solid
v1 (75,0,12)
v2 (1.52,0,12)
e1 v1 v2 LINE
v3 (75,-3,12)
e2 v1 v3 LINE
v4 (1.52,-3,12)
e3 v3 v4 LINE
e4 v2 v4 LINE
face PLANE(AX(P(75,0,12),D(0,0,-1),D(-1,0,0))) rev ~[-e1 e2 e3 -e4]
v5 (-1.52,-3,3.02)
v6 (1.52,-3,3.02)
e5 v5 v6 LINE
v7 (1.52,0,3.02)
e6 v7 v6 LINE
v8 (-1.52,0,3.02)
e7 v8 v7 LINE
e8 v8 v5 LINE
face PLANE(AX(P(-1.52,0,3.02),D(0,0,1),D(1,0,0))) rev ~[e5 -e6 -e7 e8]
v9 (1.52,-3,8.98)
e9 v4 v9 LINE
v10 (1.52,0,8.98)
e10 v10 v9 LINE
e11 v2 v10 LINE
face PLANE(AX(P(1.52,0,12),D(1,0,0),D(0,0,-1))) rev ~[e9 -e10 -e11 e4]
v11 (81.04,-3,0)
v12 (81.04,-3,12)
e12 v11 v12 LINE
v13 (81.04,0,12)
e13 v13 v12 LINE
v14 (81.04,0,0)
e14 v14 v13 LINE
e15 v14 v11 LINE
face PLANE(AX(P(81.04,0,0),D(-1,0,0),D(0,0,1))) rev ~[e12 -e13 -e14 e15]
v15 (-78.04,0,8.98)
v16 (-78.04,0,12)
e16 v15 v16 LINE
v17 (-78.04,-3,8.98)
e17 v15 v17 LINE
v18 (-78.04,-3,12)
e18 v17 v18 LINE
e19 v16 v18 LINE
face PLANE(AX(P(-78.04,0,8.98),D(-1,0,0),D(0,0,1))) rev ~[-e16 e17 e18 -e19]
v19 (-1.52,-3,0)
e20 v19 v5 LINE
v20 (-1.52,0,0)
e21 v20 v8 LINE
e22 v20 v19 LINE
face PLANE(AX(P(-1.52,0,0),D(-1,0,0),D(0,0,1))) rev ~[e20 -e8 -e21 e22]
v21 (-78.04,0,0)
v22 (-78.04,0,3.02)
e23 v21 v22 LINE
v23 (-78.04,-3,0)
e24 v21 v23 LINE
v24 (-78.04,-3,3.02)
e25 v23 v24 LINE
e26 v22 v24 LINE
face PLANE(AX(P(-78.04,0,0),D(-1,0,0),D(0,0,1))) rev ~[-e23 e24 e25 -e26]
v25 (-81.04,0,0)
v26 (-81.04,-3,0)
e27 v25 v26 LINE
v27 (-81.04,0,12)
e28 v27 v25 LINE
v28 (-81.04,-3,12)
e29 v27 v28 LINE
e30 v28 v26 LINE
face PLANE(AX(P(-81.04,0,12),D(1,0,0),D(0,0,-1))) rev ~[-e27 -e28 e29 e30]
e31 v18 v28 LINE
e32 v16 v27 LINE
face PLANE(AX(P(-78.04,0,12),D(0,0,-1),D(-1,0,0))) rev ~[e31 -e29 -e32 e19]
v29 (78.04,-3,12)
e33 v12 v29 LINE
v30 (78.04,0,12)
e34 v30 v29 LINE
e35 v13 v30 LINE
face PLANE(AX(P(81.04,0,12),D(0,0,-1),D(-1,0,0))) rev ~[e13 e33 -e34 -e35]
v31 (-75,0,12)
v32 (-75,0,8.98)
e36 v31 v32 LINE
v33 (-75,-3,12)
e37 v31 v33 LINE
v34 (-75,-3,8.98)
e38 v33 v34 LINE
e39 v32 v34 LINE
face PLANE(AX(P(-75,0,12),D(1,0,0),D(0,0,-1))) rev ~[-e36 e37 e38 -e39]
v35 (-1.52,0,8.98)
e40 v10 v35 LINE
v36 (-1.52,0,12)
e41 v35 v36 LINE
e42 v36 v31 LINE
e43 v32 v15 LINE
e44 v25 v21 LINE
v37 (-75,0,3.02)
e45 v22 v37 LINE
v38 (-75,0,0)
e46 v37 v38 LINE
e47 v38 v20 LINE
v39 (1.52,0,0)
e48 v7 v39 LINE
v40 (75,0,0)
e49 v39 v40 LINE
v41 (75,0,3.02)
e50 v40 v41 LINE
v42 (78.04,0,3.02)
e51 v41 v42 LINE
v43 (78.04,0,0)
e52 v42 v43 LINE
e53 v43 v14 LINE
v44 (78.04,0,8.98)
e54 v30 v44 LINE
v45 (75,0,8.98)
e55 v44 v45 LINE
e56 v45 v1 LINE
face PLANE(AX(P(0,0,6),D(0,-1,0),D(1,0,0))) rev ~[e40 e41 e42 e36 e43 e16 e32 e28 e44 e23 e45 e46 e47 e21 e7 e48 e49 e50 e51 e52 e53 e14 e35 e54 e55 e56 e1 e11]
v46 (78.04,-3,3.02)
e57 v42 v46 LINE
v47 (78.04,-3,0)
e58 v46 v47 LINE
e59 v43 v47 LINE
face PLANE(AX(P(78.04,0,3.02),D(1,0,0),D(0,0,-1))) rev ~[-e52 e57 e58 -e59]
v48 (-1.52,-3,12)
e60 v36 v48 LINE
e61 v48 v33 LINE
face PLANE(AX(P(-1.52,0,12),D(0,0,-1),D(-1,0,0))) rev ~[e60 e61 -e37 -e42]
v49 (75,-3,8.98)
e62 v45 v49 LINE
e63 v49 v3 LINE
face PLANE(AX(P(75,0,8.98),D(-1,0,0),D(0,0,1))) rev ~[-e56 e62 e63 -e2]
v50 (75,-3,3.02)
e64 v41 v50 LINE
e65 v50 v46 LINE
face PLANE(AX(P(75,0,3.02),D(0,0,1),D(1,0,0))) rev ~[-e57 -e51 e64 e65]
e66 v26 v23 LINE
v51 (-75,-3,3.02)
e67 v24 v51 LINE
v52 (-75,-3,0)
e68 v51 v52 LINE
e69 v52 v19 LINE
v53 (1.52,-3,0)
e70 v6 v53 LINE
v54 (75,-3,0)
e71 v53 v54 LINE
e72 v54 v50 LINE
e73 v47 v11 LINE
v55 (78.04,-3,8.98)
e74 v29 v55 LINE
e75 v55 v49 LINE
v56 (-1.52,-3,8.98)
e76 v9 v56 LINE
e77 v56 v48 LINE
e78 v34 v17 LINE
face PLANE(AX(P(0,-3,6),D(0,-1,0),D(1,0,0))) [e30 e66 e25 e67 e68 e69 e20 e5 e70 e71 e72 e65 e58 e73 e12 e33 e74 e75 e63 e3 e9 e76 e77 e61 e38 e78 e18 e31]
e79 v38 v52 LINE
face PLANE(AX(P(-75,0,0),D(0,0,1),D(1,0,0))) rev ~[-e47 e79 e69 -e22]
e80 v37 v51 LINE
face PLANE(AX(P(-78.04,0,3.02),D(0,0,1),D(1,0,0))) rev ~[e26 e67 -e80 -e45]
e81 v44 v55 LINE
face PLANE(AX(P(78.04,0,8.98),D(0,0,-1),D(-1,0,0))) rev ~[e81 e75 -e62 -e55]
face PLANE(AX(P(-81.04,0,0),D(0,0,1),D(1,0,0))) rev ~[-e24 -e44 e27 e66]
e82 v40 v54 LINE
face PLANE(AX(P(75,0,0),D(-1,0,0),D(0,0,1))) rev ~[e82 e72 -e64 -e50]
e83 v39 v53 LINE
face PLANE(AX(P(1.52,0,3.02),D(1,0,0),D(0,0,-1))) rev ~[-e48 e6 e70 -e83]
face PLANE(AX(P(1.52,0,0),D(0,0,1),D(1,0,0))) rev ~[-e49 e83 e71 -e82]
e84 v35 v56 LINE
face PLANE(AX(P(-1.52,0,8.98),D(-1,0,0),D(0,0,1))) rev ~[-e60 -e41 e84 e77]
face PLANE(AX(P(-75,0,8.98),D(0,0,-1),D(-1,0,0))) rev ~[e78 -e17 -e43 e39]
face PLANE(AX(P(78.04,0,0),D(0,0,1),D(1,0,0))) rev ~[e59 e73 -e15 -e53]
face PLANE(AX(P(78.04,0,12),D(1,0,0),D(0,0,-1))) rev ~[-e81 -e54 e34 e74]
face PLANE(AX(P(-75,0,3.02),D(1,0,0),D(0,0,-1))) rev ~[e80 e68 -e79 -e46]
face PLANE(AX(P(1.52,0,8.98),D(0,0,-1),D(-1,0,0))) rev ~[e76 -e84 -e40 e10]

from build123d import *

# Parameters (mm, degrees)
F1_DEPTH = 3


# Not quite as in the source:
# - a feature names something its author has since deleted; it is built from what else it names


with BuildPart() as f1:
    # F0 (on Front) → F1 (new body)
    with BuildSketch(Plane.XZ):
        Polygon((-81.04, 0), (-78.04, 0), (-78.04, 3.02), (-75, 3.02), (-75, 0), (-1.52, 0), (-1.52, 3.02), (1.52, 3.02), (1.52, 0), (75, 0), (75, 3.02), (78.04, 3.02), (78.04, 0), (81.04, 0), (81.04, 12), (78.04, 12), (78.04, 8.98), (75, 8.98), (75, 12), (1.52, 12), (1.52, 8.98), (-1.52, 8.98), (-1.52, 12), (-75, 12), (-75, 8.98), (-78.04, 8.98), (-78.04, 12), (-81.04, 12), align=None)
    extrude(amount=F1_DEPTH)


solid = f1.part
